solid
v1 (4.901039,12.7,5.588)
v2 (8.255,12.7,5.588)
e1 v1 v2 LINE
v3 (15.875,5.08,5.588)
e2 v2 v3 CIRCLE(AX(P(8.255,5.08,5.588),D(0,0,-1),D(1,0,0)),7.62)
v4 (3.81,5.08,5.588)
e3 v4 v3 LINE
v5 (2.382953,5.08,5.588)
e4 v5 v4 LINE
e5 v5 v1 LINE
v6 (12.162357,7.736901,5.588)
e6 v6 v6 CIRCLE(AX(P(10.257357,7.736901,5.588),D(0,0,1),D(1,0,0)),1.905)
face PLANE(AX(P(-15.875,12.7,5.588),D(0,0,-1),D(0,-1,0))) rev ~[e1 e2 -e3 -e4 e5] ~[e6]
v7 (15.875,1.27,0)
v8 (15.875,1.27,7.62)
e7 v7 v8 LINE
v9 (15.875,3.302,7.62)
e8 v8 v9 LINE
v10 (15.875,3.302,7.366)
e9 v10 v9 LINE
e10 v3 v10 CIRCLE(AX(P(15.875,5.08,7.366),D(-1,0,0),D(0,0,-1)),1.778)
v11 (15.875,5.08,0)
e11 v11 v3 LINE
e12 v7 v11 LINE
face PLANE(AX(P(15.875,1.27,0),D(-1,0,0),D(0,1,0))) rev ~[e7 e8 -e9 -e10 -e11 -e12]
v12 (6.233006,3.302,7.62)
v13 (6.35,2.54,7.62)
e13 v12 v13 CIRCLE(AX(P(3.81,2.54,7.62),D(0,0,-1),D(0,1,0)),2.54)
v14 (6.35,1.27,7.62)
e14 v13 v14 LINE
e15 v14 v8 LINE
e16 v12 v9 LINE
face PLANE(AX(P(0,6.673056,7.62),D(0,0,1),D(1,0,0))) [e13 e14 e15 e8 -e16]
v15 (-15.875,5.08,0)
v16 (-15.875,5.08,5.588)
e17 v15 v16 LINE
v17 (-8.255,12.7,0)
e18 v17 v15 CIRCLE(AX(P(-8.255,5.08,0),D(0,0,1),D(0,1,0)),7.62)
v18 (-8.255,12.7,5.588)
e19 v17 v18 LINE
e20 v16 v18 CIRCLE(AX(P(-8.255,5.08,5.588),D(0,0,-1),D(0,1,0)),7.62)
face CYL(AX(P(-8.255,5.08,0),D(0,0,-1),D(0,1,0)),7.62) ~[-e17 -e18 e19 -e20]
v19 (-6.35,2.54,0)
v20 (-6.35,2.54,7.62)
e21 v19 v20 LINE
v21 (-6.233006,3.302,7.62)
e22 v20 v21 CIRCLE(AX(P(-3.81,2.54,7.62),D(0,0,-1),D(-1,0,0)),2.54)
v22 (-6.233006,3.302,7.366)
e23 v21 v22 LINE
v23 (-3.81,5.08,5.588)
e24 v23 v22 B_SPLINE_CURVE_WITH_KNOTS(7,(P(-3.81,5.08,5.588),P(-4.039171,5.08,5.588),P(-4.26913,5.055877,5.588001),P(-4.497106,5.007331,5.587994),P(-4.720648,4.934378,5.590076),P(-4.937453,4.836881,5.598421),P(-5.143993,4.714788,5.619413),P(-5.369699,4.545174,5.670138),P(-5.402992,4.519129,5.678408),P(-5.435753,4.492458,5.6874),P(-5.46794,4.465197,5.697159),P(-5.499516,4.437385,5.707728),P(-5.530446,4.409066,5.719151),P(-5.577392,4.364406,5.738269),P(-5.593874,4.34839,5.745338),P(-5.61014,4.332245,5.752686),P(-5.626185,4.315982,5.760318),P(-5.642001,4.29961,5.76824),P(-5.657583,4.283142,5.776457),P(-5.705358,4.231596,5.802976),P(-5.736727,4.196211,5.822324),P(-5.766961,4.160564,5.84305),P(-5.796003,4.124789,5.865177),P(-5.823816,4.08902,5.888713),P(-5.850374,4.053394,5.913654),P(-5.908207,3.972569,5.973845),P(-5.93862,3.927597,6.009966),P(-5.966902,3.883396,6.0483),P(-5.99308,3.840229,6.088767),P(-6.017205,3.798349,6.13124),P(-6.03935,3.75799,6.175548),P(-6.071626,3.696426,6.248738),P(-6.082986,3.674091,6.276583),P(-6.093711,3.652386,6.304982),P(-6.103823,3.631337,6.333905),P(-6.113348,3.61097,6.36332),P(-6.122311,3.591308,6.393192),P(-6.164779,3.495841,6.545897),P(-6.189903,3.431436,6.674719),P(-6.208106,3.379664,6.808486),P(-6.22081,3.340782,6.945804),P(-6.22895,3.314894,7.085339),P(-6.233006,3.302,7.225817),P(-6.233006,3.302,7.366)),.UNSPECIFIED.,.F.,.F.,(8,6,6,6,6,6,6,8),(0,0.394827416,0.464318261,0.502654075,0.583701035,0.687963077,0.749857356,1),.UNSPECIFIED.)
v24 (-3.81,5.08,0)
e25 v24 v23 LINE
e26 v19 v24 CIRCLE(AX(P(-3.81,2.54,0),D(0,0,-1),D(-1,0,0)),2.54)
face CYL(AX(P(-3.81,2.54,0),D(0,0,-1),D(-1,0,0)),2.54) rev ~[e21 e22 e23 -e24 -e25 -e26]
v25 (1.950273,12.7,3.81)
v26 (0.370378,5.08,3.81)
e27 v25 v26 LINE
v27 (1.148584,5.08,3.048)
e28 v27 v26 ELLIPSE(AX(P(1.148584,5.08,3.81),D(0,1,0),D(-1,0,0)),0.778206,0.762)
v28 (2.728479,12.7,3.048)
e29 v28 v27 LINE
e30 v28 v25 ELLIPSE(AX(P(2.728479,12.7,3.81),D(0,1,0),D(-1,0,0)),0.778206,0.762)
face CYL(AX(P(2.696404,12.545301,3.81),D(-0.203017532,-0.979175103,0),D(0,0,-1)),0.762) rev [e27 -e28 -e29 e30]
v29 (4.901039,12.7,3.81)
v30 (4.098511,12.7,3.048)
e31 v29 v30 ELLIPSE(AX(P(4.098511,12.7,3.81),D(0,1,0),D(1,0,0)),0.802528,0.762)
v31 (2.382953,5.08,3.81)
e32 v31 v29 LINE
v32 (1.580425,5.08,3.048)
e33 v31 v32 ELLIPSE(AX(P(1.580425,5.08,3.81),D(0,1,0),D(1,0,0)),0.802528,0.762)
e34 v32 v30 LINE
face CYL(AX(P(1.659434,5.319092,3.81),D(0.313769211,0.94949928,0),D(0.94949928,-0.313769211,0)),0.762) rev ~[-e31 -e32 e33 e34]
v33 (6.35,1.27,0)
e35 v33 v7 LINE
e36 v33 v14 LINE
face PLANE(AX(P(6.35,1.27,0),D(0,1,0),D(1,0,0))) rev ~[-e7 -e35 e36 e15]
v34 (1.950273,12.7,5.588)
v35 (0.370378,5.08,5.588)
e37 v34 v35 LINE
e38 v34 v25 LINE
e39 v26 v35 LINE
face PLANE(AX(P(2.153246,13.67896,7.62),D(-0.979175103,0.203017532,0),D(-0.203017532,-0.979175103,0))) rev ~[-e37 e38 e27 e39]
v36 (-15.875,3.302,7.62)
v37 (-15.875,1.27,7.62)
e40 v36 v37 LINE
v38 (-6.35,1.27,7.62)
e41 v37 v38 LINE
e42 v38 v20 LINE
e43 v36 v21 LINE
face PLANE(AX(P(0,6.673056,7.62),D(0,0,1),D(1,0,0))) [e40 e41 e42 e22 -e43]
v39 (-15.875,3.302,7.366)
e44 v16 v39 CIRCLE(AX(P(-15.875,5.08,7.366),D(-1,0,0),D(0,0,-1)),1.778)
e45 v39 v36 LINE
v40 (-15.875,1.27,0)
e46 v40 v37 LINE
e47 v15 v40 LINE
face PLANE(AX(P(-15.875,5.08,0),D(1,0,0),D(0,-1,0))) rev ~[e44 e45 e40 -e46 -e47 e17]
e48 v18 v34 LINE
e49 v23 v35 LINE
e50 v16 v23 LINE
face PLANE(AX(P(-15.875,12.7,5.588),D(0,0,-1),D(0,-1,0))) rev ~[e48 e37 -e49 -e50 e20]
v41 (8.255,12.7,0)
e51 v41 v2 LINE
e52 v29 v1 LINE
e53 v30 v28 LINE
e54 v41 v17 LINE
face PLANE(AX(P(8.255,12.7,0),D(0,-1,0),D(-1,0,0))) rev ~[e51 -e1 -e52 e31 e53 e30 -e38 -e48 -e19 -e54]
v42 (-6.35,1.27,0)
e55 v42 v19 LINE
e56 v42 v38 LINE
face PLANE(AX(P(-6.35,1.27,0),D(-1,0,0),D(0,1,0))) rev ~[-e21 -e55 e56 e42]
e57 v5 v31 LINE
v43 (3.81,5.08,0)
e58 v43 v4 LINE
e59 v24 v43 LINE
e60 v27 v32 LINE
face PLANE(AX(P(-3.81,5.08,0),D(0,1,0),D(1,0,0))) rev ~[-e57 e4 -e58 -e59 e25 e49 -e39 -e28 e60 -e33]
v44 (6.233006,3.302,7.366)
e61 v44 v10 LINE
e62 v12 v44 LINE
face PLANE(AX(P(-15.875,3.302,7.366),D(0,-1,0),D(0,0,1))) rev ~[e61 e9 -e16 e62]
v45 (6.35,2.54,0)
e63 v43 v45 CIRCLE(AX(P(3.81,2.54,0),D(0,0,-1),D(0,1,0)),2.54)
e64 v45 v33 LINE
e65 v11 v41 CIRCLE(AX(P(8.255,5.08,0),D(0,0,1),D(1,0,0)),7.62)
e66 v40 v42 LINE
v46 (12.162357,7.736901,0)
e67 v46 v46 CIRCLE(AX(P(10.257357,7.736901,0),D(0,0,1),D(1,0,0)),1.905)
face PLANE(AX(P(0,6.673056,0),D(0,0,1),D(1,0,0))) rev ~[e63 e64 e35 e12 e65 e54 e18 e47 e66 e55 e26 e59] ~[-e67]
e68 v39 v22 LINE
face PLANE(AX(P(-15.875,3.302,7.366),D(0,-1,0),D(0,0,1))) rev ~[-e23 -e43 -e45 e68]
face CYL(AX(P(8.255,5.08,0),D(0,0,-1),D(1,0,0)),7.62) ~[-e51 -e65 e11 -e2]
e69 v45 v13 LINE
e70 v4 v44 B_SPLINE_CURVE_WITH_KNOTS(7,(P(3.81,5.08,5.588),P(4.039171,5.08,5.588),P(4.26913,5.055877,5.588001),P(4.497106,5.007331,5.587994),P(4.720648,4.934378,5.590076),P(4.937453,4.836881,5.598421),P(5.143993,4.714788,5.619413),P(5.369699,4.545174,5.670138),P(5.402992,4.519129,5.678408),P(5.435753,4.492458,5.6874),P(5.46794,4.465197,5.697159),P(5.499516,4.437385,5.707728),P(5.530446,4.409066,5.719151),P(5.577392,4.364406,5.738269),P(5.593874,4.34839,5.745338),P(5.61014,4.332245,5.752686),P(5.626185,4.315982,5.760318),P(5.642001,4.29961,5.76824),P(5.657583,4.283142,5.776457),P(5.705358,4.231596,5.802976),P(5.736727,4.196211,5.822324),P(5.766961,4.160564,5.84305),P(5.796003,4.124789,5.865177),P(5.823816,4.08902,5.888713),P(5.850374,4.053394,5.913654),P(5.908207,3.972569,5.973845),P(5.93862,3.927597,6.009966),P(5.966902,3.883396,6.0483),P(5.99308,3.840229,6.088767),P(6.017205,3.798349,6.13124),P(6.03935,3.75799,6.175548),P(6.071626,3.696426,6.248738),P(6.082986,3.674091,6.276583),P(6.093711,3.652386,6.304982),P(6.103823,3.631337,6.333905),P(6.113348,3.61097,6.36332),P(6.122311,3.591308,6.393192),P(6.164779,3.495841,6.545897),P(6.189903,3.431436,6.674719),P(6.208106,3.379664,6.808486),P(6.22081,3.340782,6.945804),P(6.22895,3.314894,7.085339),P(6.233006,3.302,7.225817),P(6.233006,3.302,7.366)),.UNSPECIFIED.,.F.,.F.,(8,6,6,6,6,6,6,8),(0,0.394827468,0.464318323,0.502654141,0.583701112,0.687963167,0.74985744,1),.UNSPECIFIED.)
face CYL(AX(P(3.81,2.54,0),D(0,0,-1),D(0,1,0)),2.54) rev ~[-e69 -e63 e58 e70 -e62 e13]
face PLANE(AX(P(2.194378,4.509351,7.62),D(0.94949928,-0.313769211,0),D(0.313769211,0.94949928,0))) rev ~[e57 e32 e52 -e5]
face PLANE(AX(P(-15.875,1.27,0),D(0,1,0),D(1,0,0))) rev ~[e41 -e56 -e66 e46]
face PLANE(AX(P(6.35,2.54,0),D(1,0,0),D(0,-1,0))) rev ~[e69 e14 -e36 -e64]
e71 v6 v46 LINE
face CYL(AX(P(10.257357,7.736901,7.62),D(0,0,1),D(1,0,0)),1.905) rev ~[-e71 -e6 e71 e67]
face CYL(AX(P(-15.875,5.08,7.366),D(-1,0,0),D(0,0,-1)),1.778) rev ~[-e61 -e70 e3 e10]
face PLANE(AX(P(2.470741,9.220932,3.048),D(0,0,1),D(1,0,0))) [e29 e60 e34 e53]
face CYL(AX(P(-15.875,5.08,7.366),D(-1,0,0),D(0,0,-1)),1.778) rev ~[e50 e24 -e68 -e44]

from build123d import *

# Parameters (mm, degrees)
F1_DEPTH = 7.62
F3_DEPTH = 4.572
F4_R     = 0.762
F5_R     = 1.905
F6_DEPTH = 7.621
F8_DEPTH = 31.751


with BuildPart() as f1:
    # F0 (on Top) → F1 (new body)
    with BuildSketch(Plane.XY):
        with BuildLine():
            ThreePointArc((-6.35, 2.54), (-5.6060512242, 4.3360512242), (-3.81, 5.08))
            Line((-3.81, 5.08), (3.81, 5.08))
            ThreePointArc((3.81, 5.08), (5.6060512242, 4.3360512242), (6.35, 2.54))
            Line((6.35, 2.54), (6.35, 1.27))
            Line((6.35, 1.27), (15.875, 1.27))
            Line((15.875, 1.27), (15.875, 5.08))
            ThreePointArc((15.875, 5.08), (13.6431536726, 10.4681536726), (8.255, 12.7))
            Line((8.255, 12.7), (-8.255, 12.7))
            ThreePointArc((-8.255, 12.7), (-13.6431536726, 10.4681536726), (-15.875, 5.08))
            Line((-15.875, 5.08), (-15.875, 1.27))
            Line((-15.875, 1.27), (-6.35, 1.27))
            Line((-6.35, 1.27), (-6.35, 2.54))
        make_face()
    extrude(amount=F1_DEPTH)

    # F2 (on face) → F3 (cut)
    with BuildSketch(Plane.XY.offset(7.62)):
        Polygon((2.153245525, 13.6789603775), (0.3542888121, 5.0024012453), (2.1943775111, 4.5093509644), (4.9747148636, 12.9229499468), align=None)
    extrude(amount=-F3_DEPTH, mode=Mode.SUBTRACT)

    # F4
    f4_edges = [f1.edges().sort_by_distance(p)[0] for p in [
        (1.160325, 8.89, 3.048),
        (3.641996, 8.89, 3.048),
    ]]
    fillet(f4_edges, radius=F4_R)

    # F5 (on face) → F6 (cut, through all)
    with BuildSketch(Plane.XY.offset(7.62)):
        with Locations((10.2573568001, 7.736901287)):
            Circle(F5_R)
    extrude(amount=-F6_DEPTH, mode=Mode.SUBTRACT)

    # F7 (on face) → F8 (cut, through all)
    with BuildSketch(Plane(origin=(-15.875, 0, 0), x_dir=(0, -1, 0), z_dir=(-1, 0, 0))):
        with BuildLine():
            Line((-3.302, 7.62), (-12.7, 7.62))
            Line((-12.7, 7.62), (-12.7, 5.588))
            Line((-12.7, 5.588), (-5.08, 5.588))
            ThreePointArc((-5.08, 5.588), (-3.8227641431, 6.1087641431), (-3.302, 7.366))
            Line((-3.302, 7.366), (-3.302, 7.62))
        make_face()
    extrude(amount=-F8_DEPTH, mode=Mode.SUBTRACT)


solid = f1.part
